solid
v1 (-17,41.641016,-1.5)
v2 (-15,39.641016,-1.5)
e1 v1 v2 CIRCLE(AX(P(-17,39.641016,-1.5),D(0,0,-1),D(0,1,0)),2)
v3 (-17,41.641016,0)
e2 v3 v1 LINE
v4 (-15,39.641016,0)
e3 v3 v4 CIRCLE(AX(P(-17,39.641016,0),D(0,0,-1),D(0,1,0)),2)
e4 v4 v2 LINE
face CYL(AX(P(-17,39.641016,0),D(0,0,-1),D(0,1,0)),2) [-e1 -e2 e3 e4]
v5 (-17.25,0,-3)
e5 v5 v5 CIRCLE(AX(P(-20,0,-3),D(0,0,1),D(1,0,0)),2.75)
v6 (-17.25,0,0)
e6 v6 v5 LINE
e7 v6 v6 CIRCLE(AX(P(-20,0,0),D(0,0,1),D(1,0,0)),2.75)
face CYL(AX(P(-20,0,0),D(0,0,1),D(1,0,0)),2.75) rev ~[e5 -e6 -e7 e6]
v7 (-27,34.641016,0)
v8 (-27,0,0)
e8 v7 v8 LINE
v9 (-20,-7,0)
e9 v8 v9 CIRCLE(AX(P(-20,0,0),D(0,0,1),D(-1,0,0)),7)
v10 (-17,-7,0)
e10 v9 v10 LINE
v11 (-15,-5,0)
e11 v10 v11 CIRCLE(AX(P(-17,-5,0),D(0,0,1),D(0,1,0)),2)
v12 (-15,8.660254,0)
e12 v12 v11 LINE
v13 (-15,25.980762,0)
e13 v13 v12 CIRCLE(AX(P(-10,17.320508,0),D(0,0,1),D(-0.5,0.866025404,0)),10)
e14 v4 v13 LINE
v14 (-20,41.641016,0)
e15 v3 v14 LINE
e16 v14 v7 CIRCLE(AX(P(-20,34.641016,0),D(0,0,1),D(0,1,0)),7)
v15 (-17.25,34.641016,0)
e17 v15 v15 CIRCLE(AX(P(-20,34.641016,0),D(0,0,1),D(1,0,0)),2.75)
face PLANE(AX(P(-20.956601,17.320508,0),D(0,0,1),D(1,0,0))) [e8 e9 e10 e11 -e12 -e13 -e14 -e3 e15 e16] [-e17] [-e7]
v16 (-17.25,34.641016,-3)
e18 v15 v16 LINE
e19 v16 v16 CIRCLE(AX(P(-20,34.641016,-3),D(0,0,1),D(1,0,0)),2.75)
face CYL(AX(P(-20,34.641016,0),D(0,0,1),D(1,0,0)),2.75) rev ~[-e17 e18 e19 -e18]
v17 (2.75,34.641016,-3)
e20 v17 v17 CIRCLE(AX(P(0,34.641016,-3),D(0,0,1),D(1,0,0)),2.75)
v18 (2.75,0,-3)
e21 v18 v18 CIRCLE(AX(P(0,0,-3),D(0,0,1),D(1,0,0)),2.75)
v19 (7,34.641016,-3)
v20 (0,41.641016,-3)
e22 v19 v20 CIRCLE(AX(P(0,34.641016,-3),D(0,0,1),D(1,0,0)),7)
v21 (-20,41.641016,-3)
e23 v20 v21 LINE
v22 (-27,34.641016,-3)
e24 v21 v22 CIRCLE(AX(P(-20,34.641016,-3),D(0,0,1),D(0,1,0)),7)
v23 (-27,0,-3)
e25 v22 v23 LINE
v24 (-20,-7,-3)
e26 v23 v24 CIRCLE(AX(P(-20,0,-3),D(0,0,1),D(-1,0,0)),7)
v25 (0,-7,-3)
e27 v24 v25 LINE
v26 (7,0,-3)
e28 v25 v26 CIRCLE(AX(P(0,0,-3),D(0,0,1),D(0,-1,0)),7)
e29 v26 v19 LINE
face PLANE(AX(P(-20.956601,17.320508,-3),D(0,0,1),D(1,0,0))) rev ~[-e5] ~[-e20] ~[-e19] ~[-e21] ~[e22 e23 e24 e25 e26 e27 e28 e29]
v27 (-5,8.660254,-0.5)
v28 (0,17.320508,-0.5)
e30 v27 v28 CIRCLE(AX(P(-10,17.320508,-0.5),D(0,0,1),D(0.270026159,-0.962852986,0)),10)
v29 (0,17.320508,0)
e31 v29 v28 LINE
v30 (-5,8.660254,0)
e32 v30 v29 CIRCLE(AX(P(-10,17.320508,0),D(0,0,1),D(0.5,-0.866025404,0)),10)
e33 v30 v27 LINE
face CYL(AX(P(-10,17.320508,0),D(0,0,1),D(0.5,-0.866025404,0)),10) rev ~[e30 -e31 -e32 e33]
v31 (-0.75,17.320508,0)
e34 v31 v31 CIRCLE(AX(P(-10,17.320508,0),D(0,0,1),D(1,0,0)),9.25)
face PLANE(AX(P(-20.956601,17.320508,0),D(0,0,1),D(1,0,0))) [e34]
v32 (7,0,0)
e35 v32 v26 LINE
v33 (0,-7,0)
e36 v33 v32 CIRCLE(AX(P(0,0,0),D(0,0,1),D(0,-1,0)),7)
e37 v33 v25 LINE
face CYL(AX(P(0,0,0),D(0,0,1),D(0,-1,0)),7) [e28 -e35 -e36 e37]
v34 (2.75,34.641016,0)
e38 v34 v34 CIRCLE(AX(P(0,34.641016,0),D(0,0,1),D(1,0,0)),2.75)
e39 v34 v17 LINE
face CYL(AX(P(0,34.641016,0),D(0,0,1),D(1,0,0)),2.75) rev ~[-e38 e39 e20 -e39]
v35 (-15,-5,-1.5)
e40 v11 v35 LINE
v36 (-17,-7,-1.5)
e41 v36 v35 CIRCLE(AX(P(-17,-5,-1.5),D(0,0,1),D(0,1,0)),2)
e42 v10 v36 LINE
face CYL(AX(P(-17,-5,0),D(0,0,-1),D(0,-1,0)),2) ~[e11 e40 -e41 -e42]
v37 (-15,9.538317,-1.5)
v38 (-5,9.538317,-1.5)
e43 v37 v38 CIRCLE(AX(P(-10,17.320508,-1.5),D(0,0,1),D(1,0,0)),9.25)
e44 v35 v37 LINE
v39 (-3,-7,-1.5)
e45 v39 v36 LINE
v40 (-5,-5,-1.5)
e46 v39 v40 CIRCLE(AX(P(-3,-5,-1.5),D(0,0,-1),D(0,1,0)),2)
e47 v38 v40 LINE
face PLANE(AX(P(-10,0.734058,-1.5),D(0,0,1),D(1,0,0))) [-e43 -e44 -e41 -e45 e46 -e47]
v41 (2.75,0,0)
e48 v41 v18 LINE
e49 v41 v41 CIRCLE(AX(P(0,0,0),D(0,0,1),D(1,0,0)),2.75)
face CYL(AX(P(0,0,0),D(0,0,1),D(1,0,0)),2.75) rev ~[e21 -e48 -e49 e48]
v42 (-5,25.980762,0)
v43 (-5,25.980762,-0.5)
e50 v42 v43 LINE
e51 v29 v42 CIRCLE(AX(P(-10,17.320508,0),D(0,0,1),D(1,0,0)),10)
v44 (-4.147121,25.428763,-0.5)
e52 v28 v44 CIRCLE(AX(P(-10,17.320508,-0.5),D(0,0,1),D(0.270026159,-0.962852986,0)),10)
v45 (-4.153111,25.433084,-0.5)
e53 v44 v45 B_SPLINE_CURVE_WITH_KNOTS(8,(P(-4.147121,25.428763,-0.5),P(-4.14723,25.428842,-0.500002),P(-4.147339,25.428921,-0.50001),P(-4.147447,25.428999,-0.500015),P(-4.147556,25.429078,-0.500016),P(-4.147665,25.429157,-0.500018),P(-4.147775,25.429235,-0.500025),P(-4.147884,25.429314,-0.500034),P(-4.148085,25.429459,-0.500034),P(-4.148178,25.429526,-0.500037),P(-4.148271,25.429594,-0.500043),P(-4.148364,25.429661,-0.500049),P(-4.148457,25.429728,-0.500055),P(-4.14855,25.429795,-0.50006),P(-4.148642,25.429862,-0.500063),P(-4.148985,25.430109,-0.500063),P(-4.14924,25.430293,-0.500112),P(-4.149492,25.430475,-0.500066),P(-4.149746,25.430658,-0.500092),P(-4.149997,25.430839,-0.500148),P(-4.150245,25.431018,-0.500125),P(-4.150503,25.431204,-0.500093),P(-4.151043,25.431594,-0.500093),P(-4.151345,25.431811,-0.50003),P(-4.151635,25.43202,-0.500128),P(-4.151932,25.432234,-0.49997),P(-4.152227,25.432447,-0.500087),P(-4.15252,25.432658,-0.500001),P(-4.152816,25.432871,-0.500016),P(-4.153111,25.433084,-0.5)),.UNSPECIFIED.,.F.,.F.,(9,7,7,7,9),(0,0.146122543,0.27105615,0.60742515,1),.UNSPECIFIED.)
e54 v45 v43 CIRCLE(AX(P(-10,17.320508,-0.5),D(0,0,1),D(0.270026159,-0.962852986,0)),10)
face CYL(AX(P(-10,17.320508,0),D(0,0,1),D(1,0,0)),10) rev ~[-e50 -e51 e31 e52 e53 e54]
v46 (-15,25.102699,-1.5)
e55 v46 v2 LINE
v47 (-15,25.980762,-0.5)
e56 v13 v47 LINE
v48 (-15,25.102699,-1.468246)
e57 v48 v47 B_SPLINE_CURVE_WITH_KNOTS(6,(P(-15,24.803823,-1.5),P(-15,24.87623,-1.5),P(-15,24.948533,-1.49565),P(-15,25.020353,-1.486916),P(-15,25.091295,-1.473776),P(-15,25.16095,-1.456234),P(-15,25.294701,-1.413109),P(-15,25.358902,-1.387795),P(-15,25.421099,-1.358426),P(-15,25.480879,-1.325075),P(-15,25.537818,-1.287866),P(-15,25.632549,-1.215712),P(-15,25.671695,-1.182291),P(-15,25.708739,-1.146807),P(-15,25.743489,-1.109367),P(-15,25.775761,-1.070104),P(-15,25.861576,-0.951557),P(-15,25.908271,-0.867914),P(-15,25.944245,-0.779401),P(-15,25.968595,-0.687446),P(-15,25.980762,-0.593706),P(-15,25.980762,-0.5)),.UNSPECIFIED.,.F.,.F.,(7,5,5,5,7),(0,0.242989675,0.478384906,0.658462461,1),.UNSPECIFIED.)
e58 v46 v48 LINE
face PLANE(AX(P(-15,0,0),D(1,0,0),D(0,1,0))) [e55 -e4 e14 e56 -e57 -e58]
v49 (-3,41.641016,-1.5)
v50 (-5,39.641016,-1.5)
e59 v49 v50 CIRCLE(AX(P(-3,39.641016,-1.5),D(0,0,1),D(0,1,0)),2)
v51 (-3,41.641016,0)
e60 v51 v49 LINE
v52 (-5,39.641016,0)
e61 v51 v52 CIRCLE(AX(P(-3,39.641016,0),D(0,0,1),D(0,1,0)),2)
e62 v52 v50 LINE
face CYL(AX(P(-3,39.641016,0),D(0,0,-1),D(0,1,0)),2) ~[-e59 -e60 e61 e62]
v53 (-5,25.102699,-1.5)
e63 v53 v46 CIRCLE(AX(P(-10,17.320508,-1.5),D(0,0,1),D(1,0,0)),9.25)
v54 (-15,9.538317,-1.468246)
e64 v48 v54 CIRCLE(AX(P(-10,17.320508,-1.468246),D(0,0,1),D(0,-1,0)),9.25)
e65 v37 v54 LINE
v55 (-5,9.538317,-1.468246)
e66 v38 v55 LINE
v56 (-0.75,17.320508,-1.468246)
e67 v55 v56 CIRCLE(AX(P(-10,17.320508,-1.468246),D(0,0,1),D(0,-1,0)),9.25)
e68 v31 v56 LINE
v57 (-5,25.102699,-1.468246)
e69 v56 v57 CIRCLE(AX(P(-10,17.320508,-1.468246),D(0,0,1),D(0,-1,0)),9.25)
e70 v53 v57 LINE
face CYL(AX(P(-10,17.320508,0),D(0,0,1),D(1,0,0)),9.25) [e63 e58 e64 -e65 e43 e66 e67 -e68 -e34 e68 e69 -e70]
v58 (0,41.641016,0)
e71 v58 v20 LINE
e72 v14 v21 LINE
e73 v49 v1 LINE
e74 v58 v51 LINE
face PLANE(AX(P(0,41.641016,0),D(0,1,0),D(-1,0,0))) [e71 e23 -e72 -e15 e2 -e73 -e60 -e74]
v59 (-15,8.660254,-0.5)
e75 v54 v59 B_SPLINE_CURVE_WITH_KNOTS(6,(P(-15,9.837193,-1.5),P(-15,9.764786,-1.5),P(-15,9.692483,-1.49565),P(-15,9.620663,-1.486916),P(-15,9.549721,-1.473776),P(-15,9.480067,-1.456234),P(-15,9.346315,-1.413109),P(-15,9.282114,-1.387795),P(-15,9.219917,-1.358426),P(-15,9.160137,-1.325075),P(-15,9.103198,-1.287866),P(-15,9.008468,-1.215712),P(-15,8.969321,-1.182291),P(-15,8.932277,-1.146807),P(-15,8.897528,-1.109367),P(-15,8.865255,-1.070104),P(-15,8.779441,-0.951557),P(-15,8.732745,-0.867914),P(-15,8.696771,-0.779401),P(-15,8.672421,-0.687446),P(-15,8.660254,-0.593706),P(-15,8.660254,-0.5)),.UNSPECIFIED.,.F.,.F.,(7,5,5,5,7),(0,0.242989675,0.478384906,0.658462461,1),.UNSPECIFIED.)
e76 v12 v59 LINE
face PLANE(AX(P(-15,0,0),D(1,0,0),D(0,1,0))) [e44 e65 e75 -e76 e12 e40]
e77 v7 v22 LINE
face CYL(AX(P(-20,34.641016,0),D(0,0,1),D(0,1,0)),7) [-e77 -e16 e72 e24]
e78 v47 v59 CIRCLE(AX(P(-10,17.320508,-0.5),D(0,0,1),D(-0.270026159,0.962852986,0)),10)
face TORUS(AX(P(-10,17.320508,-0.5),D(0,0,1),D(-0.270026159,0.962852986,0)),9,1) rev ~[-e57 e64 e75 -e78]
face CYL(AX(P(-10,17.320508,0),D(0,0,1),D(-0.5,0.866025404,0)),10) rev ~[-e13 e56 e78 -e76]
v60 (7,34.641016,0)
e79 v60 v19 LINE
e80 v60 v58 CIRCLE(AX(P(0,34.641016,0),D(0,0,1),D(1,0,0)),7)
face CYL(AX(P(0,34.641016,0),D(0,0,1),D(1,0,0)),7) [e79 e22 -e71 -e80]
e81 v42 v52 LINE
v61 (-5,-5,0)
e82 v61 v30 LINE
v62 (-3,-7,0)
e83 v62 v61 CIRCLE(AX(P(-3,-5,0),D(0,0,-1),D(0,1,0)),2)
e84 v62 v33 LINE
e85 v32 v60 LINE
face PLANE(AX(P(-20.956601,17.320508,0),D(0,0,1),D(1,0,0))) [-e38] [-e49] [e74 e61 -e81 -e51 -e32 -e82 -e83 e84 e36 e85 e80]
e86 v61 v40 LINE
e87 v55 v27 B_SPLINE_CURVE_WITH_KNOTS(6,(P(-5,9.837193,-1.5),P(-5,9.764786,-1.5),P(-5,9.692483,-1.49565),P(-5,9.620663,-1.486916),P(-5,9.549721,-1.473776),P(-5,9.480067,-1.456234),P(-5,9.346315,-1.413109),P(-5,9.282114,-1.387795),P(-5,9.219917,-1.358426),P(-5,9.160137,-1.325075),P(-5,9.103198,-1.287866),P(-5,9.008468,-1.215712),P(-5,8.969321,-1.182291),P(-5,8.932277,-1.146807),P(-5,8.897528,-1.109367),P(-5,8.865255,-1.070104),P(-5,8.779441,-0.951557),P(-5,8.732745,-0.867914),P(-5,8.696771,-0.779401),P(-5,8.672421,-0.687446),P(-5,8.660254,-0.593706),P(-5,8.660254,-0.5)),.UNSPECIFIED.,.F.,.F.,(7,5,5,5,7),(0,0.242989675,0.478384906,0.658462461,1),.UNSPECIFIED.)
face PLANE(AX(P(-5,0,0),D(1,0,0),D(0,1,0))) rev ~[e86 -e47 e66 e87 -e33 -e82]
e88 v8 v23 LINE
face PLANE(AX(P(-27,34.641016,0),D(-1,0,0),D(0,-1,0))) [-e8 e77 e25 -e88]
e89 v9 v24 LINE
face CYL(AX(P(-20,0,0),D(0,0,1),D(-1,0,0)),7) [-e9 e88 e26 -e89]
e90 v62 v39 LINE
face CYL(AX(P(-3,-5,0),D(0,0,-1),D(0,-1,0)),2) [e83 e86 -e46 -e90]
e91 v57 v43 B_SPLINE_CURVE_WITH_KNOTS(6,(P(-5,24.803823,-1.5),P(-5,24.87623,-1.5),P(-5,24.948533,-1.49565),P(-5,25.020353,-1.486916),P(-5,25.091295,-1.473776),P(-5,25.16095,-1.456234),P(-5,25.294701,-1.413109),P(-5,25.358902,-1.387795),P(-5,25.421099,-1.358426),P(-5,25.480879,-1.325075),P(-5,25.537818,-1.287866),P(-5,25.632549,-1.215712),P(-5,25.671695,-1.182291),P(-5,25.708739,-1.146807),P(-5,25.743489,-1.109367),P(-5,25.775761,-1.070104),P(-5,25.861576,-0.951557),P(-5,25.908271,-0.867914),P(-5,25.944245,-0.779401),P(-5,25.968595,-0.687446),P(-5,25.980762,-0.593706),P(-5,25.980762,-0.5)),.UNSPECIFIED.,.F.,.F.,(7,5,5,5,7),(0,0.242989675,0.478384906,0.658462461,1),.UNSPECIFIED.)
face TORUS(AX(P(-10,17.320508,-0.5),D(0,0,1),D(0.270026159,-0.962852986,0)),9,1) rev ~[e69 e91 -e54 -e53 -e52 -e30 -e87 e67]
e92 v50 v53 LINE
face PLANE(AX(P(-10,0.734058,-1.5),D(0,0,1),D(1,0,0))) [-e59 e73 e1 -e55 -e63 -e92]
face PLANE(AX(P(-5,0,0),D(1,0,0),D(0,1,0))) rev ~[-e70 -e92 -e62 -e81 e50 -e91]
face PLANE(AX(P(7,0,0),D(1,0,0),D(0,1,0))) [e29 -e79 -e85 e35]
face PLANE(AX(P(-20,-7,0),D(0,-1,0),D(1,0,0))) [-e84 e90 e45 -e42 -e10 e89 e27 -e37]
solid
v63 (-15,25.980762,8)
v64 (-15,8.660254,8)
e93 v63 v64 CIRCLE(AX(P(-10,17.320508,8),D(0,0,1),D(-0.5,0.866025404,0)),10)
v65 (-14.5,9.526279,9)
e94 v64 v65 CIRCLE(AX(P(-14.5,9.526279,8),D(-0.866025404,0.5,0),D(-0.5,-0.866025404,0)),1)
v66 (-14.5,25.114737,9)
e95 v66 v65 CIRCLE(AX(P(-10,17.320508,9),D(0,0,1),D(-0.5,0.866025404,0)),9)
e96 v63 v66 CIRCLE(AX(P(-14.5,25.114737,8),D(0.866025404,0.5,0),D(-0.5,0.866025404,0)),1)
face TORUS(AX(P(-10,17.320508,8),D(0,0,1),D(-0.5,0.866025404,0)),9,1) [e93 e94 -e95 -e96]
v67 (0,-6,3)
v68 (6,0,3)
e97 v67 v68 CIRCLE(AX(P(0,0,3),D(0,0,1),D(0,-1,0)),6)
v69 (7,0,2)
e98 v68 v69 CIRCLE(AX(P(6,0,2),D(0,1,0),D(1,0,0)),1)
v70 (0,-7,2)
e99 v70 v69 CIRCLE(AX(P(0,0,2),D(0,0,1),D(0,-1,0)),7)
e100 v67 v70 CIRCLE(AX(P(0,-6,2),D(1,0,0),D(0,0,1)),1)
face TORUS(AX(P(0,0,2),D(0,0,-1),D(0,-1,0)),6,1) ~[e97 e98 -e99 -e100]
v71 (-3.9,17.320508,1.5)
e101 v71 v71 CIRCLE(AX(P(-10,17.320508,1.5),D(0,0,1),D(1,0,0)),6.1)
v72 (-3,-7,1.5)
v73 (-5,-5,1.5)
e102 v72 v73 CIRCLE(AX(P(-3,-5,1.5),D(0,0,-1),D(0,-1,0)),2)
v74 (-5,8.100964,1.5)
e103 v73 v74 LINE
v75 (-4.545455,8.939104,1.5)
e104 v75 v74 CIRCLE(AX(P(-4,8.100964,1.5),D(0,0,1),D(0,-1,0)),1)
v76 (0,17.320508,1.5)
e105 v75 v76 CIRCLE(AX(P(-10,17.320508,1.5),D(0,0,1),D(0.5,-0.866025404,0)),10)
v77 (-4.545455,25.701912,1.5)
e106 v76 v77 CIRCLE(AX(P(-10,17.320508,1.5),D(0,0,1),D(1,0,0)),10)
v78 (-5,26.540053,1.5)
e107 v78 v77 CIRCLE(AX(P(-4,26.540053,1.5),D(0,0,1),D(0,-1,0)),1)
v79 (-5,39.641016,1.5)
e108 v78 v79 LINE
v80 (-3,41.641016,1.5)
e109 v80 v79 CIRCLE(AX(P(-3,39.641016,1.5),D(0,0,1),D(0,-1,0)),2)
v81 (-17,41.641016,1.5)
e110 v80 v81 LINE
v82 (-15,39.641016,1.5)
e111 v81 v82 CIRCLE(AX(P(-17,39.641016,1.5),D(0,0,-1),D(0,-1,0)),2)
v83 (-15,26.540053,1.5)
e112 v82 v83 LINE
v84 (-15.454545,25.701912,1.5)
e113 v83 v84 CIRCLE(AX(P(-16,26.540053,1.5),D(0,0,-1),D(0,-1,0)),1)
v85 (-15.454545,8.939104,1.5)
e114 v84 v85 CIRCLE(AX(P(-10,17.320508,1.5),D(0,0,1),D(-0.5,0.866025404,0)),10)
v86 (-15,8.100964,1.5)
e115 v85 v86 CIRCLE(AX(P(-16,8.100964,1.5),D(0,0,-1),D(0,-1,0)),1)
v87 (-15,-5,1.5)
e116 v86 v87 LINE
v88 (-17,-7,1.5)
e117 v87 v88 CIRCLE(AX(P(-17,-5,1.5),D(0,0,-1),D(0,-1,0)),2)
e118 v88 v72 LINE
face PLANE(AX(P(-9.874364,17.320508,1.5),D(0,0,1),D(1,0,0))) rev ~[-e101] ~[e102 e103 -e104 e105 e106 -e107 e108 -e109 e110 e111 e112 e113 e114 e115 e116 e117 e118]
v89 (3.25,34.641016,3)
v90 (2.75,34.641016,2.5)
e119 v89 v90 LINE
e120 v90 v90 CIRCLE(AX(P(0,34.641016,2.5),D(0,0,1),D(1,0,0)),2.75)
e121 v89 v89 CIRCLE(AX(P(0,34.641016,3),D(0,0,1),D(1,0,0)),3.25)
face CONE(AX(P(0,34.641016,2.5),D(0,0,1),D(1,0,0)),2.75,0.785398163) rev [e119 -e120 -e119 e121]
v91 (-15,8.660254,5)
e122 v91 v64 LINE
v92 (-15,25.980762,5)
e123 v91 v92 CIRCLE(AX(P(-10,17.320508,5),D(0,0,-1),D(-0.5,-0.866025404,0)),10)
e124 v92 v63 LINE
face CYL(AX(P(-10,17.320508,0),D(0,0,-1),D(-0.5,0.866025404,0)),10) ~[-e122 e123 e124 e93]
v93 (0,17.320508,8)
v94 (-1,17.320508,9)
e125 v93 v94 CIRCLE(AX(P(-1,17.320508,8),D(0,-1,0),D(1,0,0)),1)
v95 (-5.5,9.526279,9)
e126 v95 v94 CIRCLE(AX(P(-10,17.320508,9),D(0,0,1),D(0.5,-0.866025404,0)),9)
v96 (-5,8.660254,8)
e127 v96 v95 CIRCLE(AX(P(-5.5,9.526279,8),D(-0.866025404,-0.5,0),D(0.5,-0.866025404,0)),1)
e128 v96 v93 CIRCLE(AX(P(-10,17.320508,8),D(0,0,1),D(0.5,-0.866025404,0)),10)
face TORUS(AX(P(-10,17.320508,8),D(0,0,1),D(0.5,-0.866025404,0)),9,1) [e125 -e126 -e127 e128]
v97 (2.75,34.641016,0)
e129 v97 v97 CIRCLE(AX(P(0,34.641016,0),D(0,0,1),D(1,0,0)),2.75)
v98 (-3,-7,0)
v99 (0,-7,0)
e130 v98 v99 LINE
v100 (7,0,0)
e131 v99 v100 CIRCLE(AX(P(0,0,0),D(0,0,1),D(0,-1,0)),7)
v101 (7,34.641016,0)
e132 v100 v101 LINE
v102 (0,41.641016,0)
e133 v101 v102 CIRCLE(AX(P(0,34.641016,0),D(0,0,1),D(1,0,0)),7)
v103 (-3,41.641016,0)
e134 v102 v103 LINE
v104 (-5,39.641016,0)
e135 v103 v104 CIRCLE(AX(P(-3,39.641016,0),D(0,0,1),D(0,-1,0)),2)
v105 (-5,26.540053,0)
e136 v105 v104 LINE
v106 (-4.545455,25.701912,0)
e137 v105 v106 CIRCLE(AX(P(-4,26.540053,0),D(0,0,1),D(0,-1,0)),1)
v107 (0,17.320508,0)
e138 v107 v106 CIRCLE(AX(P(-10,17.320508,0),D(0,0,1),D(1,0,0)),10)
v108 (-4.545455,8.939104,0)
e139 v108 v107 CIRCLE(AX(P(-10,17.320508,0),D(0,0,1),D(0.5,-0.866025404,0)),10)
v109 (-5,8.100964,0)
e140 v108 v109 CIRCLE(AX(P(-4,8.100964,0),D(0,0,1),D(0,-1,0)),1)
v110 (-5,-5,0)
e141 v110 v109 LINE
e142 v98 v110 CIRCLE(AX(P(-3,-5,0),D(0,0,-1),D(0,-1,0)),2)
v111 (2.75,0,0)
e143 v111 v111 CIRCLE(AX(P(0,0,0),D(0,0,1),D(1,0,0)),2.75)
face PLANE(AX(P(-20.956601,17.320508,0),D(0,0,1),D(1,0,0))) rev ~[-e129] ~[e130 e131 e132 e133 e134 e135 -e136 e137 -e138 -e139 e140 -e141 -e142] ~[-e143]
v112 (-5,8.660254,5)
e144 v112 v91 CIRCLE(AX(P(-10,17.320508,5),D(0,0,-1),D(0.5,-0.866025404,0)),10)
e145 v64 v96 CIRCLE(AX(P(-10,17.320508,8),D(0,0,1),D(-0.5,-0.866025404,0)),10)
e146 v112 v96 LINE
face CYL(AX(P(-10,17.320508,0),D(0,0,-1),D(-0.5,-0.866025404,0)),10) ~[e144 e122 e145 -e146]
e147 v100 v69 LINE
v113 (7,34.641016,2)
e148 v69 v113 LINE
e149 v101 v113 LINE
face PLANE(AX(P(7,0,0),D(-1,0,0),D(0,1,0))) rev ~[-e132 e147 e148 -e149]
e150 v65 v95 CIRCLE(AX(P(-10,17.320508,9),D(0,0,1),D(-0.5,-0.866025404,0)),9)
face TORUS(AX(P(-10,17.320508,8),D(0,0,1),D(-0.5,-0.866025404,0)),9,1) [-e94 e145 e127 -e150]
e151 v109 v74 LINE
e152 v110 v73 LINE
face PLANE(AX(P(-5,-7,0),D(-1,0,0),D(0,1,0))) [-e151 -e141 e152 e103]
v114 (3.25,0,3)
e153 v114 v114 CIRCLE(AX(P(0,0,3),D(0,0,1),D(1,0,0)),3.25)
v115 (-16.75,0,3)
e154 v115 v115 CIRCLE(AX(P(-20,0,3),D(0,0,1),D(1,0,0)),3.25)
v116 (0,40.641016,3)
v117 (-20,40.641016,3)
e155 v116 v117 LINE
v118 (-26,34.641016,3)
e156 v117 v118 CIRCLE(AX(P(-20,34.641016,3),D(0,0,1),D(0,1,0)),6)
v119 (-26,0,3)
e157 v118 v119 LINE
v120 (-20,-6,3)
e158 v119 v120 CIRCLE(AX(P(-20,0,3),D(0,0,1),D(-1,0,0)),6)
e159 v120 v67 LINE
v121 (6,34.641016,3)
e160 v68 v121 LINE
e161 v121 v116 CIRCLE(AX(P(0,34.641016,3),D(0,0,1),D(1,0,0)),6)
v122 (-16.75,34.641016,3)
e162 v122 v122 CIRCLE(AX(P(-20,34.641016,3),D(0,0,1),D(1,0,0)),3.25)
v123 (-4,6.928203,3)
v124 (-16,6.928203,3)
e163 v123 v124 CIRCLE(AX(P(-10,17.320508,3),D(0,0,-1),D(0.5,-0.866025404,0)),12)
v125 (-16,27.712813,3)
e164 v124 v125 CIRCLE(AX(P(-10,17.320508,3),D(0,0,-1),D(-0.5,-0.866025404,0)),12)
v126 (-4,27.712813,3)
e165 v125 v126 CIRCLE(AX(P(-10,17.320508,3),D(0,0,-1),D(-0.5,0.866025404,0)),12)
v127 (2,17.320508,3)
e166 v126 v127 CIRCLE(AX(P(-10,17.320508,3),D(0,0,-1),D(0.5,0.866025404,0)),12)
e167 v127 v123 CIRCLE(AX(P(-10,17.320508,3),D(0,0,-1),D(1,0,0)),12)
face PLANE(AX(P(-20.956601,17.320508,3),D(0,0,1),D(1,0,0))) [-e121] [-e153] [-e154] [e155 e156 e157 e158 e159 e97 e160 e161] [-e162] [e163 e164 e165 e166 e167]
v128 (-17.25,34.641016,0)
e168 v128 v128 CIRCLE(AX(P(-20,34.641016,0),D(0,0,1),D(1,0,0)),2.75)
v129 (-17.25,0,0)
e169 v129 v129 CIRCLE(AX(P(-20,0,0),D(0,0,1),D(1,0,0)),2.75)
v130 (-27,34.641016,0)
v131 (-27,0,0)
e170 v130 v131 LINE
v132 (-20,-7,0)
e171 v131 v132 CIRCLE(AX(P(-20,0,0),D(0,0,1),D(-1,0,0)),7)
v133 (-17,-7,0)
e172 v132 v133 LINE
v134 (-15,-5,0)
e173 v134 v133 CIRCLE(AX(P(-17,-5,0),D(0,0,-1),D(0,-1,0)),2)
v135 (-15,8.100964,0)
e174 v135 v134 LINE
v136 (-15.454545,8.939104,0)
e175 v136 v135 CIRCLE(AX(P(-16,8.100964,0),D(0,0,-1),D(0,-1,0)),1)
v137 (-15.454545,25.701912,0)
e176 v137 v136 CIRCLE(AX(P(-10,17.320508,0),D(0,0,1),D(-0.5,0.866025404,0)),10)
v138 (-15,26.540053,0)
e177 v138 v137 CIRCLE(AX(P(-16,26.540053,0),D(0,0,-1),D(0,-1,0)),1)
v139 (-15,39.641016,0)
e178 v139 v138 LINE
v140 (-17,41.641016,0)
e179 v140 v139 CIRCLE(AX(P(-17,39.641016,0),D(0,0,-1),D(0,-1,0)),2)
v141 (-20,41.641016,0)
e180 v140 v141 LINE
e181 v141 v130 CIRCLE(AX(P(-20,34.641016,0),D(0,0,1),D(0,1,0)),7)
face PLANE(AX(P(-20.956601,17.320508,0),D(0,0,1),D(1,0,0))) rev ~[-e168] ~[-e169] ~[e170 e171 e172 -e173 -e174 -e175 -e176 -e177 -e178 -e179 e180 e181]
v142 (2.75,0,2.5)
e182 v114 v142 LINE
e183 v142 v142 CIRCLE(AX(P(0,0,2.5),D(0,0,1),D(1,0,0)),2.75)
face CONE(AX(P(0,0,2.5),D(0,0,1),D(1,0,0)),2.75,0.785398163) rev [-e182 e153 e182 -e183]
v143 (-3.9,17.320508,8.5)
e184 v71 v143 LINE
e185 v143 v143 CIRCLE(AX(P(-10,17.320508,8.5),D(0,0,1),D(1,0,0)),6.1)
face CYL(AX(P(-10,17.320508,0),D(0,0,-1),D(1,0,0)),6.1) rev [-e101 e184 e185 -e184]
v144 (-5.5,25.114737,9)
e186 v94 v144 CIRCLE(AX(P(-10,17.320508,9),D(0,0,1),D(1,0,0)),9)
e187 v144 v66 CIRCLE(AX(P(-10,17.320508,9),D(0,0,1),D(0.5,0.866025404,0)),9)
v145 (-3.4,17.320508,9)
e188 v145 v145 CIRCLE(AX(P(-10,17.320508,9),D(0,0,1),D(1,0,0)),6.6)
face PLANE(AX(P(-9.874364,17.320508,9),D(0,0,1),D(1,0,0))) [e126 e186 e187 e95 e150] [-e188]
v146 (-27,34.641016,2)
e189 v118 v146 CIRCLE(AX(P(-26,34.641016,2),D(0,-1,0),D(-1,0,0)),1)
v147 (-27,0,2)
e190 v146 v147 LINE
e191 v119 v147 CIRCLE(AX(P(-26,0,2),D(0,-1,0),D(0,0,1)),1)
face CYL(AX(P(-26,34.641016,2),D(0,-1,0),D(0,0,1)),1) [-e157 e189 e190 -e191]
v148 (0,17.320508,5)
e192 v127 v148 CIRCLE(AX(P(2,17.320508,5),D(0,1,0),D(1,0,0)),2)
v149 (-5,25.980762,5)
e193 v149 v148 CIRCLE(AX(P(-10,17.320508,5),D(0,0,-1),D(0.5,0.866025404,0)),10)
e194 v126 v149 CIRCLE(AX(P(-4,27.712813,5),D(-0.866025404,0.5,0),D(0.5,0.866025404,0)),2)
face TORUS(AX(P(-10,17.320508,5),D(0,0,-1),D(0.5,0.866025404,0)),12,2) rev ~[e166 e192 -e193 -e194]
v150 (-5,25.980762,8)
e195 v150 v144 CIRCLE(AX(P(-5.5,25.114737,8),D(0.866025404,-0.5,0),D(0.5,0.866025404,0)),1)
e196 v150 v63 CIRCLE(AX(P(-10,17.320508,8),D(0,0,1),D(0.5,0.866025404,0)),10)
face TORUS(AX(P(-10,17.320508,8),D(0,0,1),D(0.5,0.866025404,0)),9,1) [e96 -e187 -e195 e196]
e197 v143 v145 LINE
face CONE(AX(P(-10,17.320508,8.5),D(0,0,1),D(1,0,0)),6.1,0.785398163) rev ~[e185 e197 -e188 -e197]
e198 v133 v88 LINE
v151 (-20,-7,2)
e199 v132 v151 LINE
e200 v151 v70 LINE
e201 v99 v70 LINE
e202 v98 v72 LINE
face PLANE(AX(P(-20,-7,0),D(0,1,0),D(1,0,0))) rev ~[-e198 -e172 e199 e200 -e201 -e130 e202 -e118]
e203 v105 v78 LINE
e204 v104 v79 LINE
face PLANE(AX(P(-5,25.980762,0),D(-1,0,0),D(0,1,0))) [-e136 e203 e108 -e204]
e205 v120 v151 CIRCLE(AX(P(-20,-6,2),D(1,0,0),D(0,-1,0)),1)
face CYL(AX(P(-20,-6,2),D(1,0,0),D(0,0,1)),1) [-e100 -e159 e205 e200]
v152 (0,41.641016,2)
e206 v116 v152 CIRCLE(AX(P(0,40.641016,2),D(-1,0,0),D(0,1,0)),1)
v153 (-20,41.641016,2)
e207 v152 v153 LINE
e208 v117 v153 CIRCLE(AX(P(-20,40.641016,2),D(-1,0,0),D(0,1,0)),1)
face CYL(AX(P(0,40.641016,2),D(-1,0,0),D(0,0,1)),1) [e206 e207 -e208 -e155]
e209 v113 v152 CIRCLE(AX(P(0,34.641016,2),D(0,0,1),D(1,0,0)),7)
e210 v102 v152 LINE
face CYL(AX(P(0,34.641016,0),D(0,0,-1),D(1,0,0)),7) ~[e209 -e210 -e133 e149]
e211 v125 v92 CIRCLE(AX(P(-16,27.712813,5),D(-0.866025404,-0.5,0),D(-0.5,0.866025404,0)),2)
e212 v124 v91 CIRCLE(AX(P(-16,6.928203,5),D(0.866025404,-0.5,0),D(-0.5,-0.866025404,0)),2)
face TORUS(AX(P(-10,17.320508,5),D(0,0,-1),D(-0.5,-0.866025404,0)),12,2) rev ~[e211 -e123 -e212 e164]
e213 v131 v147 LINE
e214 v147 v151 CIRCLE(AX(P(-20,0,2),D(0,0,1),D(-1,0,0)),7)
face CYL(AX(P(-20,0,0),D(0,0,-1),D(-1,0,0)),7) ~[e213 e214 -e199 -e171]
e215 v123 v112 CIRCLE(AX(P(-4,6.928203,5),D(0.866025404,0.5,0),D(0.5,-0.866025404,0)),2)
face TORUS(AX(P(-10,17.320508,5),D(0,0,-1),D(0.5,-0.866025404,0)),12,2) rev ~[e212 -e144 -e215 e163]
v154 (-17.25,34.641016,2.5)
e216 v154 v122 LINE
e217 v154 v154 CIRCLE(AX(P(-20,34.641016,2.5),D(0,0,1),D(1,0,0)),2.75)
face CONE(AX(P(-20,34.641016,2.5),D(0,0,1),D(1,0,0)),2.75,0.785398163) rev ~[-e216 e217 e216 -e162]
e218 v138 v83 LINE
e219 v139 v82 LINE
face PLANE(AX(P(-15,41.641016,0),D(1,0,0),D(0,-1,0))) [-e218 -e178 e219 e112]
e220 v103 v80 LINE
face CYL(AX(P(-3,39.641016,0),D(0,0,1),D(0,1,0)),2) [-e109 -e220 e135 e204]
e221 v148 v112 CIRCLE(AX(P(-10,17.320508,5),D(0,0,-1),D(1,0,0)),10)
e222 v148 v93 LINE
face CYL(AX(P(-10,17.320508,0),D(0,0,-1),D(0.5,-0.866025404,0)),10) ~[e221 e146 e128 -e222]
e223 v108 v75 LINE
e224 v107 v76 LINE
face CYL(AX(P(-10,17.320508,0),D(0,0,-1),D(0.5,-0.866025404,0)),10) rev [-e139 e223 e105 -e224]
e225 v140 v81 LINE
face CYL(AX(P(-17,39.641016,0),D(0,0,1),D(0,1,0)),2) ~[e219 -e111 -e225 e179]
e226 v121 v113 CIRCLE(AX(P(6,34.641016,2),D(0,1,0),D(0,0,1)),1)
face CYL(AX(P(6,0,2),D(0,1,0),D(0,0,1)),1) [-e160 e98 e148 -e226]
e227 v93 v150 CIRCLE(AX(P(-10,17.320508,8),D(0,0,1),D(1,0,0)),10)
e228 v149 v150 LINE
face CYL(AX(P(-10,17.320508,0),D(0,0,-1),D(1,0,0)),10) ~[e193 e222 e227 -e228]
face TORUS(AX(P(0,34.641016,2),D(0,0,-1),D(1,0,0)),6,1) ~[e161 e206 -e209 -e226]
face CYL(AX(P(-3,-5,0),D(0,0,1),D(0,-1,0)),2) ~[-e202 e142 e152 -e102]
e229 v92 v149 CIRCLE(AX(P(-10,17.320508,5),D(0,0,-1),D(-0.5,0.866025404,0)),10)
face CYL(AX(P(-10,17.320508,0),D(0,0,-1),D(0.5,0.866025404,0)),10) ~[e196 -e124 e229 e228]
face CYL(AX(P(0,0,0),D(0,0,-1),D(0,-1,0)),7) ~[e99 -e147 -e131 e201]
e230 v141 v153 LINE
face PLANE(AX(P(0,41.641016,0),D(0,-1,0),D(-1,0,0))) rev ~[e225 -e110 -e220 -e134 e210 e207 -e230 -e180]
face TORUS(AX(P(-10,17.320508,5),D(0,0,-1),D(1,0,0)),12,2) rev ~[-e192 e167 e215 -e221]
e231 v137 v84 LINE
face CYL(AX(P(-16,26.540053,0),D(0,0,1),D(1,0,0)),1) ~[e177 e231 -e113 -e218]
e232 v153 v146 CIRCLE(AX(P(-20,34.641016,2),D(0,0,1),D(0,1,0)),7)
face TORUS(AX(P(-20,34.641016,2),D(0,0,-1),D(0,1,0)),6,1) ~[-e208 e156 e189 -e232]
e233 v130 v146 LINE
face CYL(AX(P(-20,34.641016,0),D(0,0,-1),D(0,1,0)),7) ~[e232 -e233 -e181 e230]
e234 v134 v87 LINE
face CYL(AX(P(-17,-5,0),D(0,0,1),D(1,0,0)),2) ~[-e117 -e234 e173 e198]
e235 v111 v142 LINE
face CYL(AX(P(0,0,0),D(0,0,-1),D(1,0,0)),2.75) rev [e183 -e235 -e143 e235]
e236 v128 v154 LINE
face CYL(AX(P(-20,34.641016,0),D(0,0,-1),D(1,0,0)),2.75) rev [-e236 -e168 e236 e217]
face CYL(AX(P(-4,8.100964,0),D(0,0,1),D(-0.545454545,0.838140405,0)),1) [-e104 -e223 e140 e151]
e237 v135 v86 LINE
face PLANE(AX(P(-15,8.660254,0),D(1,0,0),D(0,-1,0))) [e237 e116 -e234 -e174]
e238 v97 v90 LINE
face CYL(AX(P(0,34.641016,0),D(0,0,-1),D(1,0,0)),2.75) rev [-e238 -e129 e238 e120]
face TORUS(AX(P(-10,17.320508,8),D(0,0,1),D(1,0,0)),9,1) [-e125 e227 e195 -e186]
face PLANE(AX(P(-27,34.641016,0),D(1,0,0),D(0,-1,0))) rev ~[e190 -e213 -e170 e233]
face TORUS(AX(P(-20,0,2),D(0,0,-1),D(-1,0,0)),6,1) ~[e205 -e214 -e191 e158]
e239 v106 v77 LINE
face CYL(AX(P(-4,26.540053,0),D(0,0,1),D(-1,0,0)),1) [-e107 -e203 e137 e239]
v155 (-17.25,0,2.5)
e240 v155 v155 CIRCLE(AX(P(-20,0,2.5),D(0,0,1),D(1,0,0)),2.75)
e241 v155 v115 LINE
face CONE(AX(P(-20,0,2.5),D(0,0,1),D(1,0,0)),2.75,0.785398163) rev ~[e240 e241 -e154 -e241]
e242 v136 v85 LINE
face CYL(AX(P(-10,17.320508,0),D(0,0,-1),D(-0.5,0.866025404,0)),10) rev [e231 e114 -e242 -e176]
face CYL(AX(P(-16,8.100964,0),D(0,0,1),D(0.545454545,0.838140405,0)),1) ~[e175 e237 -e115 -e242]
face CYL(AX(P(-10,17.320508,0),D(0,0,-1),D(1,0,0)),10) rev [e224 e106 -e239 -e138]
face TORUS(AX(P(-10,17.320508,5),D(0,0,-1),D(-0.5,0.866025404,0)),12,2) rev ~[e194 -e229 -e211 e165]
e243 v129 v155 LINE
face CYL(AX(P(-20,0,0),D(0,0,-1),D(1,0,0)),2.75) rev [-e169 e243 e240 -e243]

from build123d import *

# Parameters (mm, degrees)
F0_R          = 2.75
F0_R_2        = 9.25
F0_R_3        = 6.1
F1_DEPTH      = 3
F2_DEPTH      = 9
F3_DEPTH      = 1.5
F4_SIZE       = 0.5
F0_R_4        = 5
F5_DEPTH      = 3
F6_DEPTH      = 1.5
F7_R          = 2
F7_2_R        = 2
F8_F1_R       = 1
F8_F2_R       = 1
F8_F3_R       = 1
F8_F4_R       = 1
F8_F5_R       = 1
F8_F6_R       = 1
F8_2_T4_ANGLE = 148.66835306
F8_2_T9_ANGLE = 148.66835306


# Not quite as in the source:
# - a fillet or chamfer that OpenCascade refuses, or shapes differently, is made with other operations: its cross-section is extruded or revolved along the edge and cut away or added
# - a feature names something its author has since deleted; it is built from what else it names


with BuildPart() as f1:
    # F0 (on Top) → F1 (new body)
    with BuildSketch(Plane.XY):
        with BuildLine():
            ThreePointArc((-15, 8.6602540378), (-20, 17.3205080757), (-15, 25.9807621135))
            Line((-15, 25.9807621135), (-15, 41.6410161514))
            Line((-15, 41.6410161514), (-20, 41.6410161514))
            ThreePointArc((-20, 41.6410161514), (-24.9497474683, 39.5907636197), (-27, 34.6410161514))
            Line((-27, 34.6410161514), (-27, 17.3205080757))
            Line((-27, 17.3205080757), (-27, 0))
            ThreePointArc((-27, 0), (-24.9497474683, -4.9497474683), (-20, -7))
            Line((-20, -7), (-15, -7))
            Line((-15, -7), (-15, 8.6602540378))
        make_face()
        with Locations((-20, 0)):
            Circle(F0_R, mode=Mode.SUBTRACT)
        with Locations((-20, 34.6410161514)):
            Circle(F0_R, mode=Mode.SUBTRACT)
        with BuildLine():
            ThreePointArc((-5, 8.6602540378), (-1.3397459622, 12.3205080757), (0, 17.3205080757))
            ThreePointArc((0, 17.3205080757), (-1.3397459622, 22.3205080757), (-5, 25.9807621135))
            ThreePointArc((-5, 25.9807621135), (-10, 27.3205080757), (-15, 25.9807621135))
            ThreePointArc((-15, 25.9807621135), (-20, 17.3205080757), (-15, 8.6602540378))
            ThreePointArc((-15, 8.6602540378), (-10, 7.3205080757), (-5, 8.6602540378))
        make_face()
        with Locations((-10, 17.3205080757)):
            Circle(F0_R_2, mode=Mode.SUBTRACT)
        with BuildLine():
            Line((-5, -7), (-5, 8.6602540378))
            ThreePointArc((-5, 8.6602540378), (-10, 7.3205080757), (-15, 8.6602540378))
            Line((-15, 8.6602540378), (-15, -7))
            Line((-15, -7), (-10, -7))
            Line((-10, -7), (-5, -7))
        make_face()
        with BuildLine():
            ThreePointArc((-15, 25.9807621135), (-10, 27.3205080757), (-5, 25.9807621135))
            Line((-5, 25.9807621135), (-5, 41.6410161514))
            Line((-5, 41.6410161514), (-10, 41.6410161514))
            Line((-10, 41.6410161514), (-15, 41.6410161514))
            Line((-15, 41.6410161514), (-15, 25.9807621135))
        make_face()
        with BuildLine():
            ThreePointArc((-5, 25.9807621135), (-1.3397459622, 22.3205080757), (0, 17.3205080757))
            ThreePointArc((0, 17.3205080757), (-1.3397459622, 12.3205080757), (-5, 8.6602540378))
            Line((-5, 8.6602540378), (-5, -7))
            Line((-5, -7), (0, -7))
            ThreePointArc((0, -7), (4.9497474683, -4.9497474683), (7, 0))
            Line((7, 0), (7, 17.3205080757))
            Line((7, 17.3205080757), (7, 34.6410161514))
            ThreePointArc((7, 34.6410161514), (4.9497474683, 39.5907636197), (0, 41.6410161514))
            Line((0, 41.6410161514), (-5, 41.6410161514))
            Line((-5, 41.6410161514), (-5, 25.9807621135))
        make_face()
        Circle(F0_R, mode=Mode.SUBTRACT)
        with Locations((0, 34.6410161514)):
            Circle(F0_R, mode=Mode.SUBTRACT)
        with Locations((-10, 17.3205080757)):
            Circle(F0_R_2)
        with Locations((-10, 17.3205080757)):
            Circle(F0_R_3, mode=Mode.SUBTRACT)
    extrude(amount=F1_DEPTH)

    # F0 (on Top) → F2 (join)
    with BuildSketch(Plane.XY):
        with BuildLine():
            ThreePointArc((-5, 8.6602540378), (-1.3397459622, 12.3205080757), (0, 17.3205080757))
            ThreePointArc((0, 17.3205080757), (-1.3397459622, 22.3205080757), (-5, 25.9807621135))
            ThreePointArc((-5, 25.9807621135), (-10, 27.3205080757), (-15, 25.9807621135))
            ThreePointArc((-15, 25.9807621135), (-20, 17.3205080757), (-15, 8.6602540378))
            ThreePointArc((-15, 8.6602540378), (-10, 7.3205080757), (-5, 8.6602540378))
        make_face()
        with Locations((-10, 17.3205080757)):
            Circle(F0_R_2, mode=Mode.SUBTRACT)
        with Locations((-10, 17.3205080757)):
            Circle(F0_R_2)
        with Locations((-10, 17.3205080757)):
            Circle(F0_R_3, mode=Mode.SUBTRACT)
    extrude(amount=F2_DEPTH)

    # F0 (on Top) → F3 (cut)
    with BuildSketch(Plane.XY):
        with BuildLine():
            ThreePointArc((-5, 8.6602540378), (-1.3397459622, 12.3205080757), (0, 17.3205080757))
            ThreePointArc((0, 17.3205080757), (-1.3397459622, 22.3205080757), (-5, 25.9807621135))
            ThreePointArc((-5, 25.9807621135), (-10, 27.3205080757), (-15, 25.9807621135))
            ThreePointArc((-15, 25.9807621135), (-20, 17.3205080757), (-15, 8.6602540378))
            ThreePointArc((-15, 8.6602540378), (-10, 7.3205080757), (-5, 8.6602540378))
        make_face()
        with Locations((-10, 17.3205080757)):
            Circle(F0_R_2, mode=Mode.SUBTRACT)
        with Locations((-10, 17.3205080757)):
            Circle(F0_R_2)
        with Locations((-10, 17.3205080757)):
            Circle(F0_R_3, mode=Mode.SUBTRACT)
        with BuildLine():
            Line((-5, -7), (-5, 8.6602540378))
            ThreePointArc((-5, 8.6602540378), (-10, 7.3205080757), (-15, 8.6602540378))
            Line((-15, 8.6602540378), (-15, -7))
            Line((-15, -7), (-10, -7))
            Line((-10, -7), (-5, -7))
        make_face()
        with BuildLine():
            ThreePointArc((-15, 25.9807621135), (-10, 27.3205080757), (-5, 25.9807621135))
            Line((-5, 25.9807621135), (-5, 41.6410161514))
            Line((-5, 41.6410161514), (-10, 41.6410161514))
            Line((-10, 41.6410161514), (-15, 41.6410161514))
            Line((-15, 41.6410161514), (-15, 25.9807621135))
        make_face()
    extrude(amount=F3_DEPTH, mode=Mode.SUBTRACT)

    # F4
    f4_edges = [f1.edges().sort_by_distance(p)[0] for p in [
        (-16.1, 17.320508, 9),
        (-22.75, 0, 3),
        (-22.75, 34.641016, 3),
        (-2.75, 34.641016, 3),
        (-2.75, 0, 3),
    ]]
    chamfer(f4_edges, length=F4_SIZE)

    # F7
    f7_edges = [f1.edges().sort_by_distance(p)[0] for p in [
        (-15, 25.980762, 3),
        (-5, -7, 0.75),
        (-15, -7, 0.75),
        (-15, 41.641016, 0.75),
        (-5, 41.641016, 0.75),
    ]]
    fillet(f7_edges, radius=F7_R)

    # F8: fillet of radius 1 on 13 edges, made by hand

    # F8_f1
    f8_f1_edges = [f1.edges().sort_by_distance(p)[0] for p in [
        (-24.9497474683, 39.5907636197, 3),
        (-10, 41.6410161514, 3),
        (-27, 17.3205080757, 3),
        (4.9497474683, 39.5907636197, 3),
        (-24.9497474683, -4.9497474683, 3),
        (7, 17.3205080757, 3),
        (-10, -7, 3),
        (4.9497474683, -4.9497474683, 3),
    ]]
    fillet(f8_f1_edges, radius=F8_F1_R)

    # F8_f2
    f8_f2_edges = [f1.edges().sort_by_distance(p)[0] for p in [
        (-15, 25.9807621135, 9),
    ]]
    fillet(f8_f2_edges, radius=F8_F2_R)

    # F8_f3
    f8_f3_edges = [f1.edges().sort_by_distance(p)[0] for p in [
        (-15, 25.9807621135, 0.75),
    ]]
    fillet(f8_f3_edges, radius=F8_F3_R)

    # F8_f4
    f8_f4_edges = [f1.edges().sort_by_distance(p)[0] for p in [
        (-15, 8.6602540378, 0.75),
    ]]
    fillet(f8_f4_edges, radius=F8_F4_R)

    # F8_f5
    f8_f5_edges = [f1.edges().sort_by_distance(p)[0] for p in [
        (-5, 25.9807621135, 0.75),
    ]]
    fillet(f8_f5_edges, radius=F8_F5_R)

    # F8_f6
    f8_f6_edges = [f1.edges().sort_by_distance(p)[0] for p in [
        (-5, 8.6602540378, 0.75),
    ]]
    fillet(f8_f6_edges, radius=F8_F6_R)


with BuildPart() as f5:
    # F0 (on Top) → F5 (new body)
    with BuildSketch(Plane.XY):
        with BuildLine():
            ThreePointArc((-15, 8.6602540378), (-20, 17.3205080757), (-15, 25.9807621135))
            Line((-15, 25.9807621135), (-15, 41.6410161514))
            Line((-15, 41.6410161514), (-20, 41.6410161514))
            ThreePointArc((-20, 41.6410161514), (-24.9497474683, 39.5907636197), (-27, 34.6410161514))
            Line((-27, 34.6410161514), (-27, 17.3205080757))
            Line((-27, 17.3205080757), (-27, 0))
            ThreePointArc((-27, 0), (-24.9497474683, -4.9497474683), (-20, -7))
            Line((-20, -7), (-15, -7))
            Line((-15, -7), (-15, 8.6602540378))
        make_face()
        with Locations((-20, 0)):
            Circle(F0_R, mode=Mode.SUBTRACT)
        with Locations((-20, 34.6410161514)):
            Circle(F0_R, mode=Mode.SUBTRACT)
        with BuildLine():
            ThreePointArc((-5, 25.9807621135), (-1.3397459622, 22.3205080757), (0, 17.3205080757))
            ThreePointArc((0, 17.3205080757), (-1.3397459622, 12.3205080757), (-5, 8.6602540378))
            Line((-5, 8.6602540378), (-5, -7))
            Line((-5, -7), (0, -7))
            ThreePointArc((0, -7), (4.9497474683, -4.9497474683), (7, 0))
            Line((7, 0), (7, 17.3205080757))
            Line((7, 17.3205080757), (7, 34.6410161514))
            ThreePointArc((7, 34.6410161514), (4.9497474683, 39.5907636197), (0, 41.6410161514))
            Line((0, 41.6410161514), (-5, 41.6410161514))
            Line((-5, 41.6410161514), (-5, 25.9807621135))
        make_face()
        Circle(F0_R, mode=Mode.SUBTRACT)
        with Locations((0, 34.6410161514)):
            Circle(F0_R, mode=Mode.SUBTRACT)
        with BuildLine():
            ThreePointArc((-5, 8.6602540378), (-1.3397459622, 12.3205080757), (0, 17.3205080757))
            ThreePointArc((0, 17.3205080757), (-1.3397459622, 22.3205080757), (-5, 25.9807621135))
            ThreePointArc((-5, 25.9807621135), (-10, 27.3205080757), (-15, 25.9807621135))
            ThreePointArc((-15, 25.9807621135), (-20, 17.3205080757), (-15, 8.6602540378))
            ThreePointArc((-15, 8.6602540378), (-10, 7.3205080757), (-5, 8.6602540378))
        make_face()
        with Locations((-10, 17.3205080757)):
            Circle(F0_R_2, mode=Mode.SUBTRACT)
        with Locations((-10, 17.3205080757)):
            Circle(F0_R_2)
        with Locations((-10, 17.3205080757)):
            Circle(F0_R_3, mode=Mode.SUBTRACT)
        with BuildLine():
            Line((-5, -7), (-5, 8.6602540378))
            ThreePointArc((-5, 8.6602540378), (-10, 7.3205080757), (-15, 8.6602540378))
            Line((-15, 8.6602540378), (-15, -7))
            Line((-15, -7), (-10, -7))
            Line((-10, -7), (-5, -7))
        make_face()
        with BuildLine():
            ThreePointArc((-15, 25.9807621135), (-10, 27.3205080757), (-5, 25.9807621135))
            Line((-5, 25.9807621135), (-5, 41.6410161514))
            Line((-5, 41.6410161514), (-10, 41.6410161514))
            Line((-10, 41.6410161514), (-15, 41.6410161514))
            Line((-15, 41.6410161514), (-15, 25.9807621135))
        make_face()
        with Locations((-10, 17.3205080757)):
            Circle(F0_R_3)
        with Locations((-10, 17.3205080757)):
            Circle(F0_R_4, mode=Mode.SUBTRACT)
        with Locations((-10, 17.3205080757)):
            Circle(F0_R_4)
    extrude(amount=-F5_DEPTH)

    # F0 (on Top) → F6 (cut)
    with BuildSketch(Plane.XY):
        with BuildLine():
            Line((-5, -7), (-5, 8.6602540378))
            ThreePointArc((-5, 8.6602540378), (-10, 7.3205080757), (-15, 8.6602540378))
            Line((-15, 8.6602540378), (-15, -7))
            Line((-15, -7), (-10, -7))
            Line((-10, -7), (-5, -7))
        make_face()
        with BuildLine():
            ThreePointArc((-5, 8.6602540378), (-1.3397459622, 12.3205080757), (0, 17.3205080757))
            ThreePointArc((0, 17.3205080757), (-1.3397459622, 22.3205080757), (-5, 25.9807621135))
            ThreePointArc((-5, 25.9807621135), (-10, 27.3205080757), (-15, 25.9807621135))
            ThreePointArc((-15, 25.9807621135), (-20, 17.3205080757), (-15, 8.6602540378))
            ThreePointArc((-15, 8.6602540378), (-10, 7.3205080757), (-5, 8.6602540378))
        make_face()
        with Locations((-10, 17.3205080757)):
            Circle(F0_R_2, mode=Mode.SUBTRACT)
        with BuildLine():
            ThreePointArc((-15, 25.9807621135), (-10, 27.3205080757), (-5, 25.9807621135))
            Line((-5, 25.9807621135), (-5, 41.6410161514))
            Line((-5, 41.6410161514), (-10, 41.6410161514))
            Line((-10, 41.6410161514), (-15, 41.6410161514))
            Line((-15, 41.6410161514), (-15, 25.9807621135))
        make_face()
    extrude(amount=-F6_DEPTH, mode=Mode.SUBTRACT)

    # F7#2
    f7_2_edges = [f5.edges().sort_by_distance(p)[0] for p in [
        (-15, 41.641016, -0.75),
        (-5, 41.641016, -0.75),
        (-15, -7, -0.75),
        (-5, -7, -0.75),
    ]]
    fillet(f7_2_edges, radius=F7_2_R)

    # F8#2: fillet of radius 1 on 2 edges, made by hand


with BuildPart() as f8_2_tool2:
    # F8_2_s3 → F8_2_t4 (revolve)
    with BuildSketch(Plane(origin=(-4.7676046878, -1.3370452184, 0), x_dir=(0, 0, 1), z_dir=(-0.9628529864, -0.270026159, 0))):
        with BuildLine():
            ThreePointArc((-1.5, 10.377364517), (-1.2071067812, 9.6702577358), (-0.5, 9.377364517))
            Line((-0.5, 9.377364517), (-1.5, 9.377364517))
            Line((-1.5, 9.377364517), (-1.5, 10.377364517))
        make_face()
    revolve(axis=Axis((-10, 17.3205080757, -1.5), (0, 0, 1)), revolution_arc=F8_2_T4_ANGLE)

    split(bisect_by=Plane.YZ.offset(-5), keep=Keep.TOP)


with BuildPart() as f5_1:
    add(f5.part)

    # F8_2_t1: union F8_2_tool2
    add(f8_2_tool2.part)


with BuildPart() as f8_2_tool7:
    # F8_2_s8 → F8_2_t9 (revolve)
    with BuildSketch(Plane(origin=(-4.7676046878, -1.3370452184, 0), x_dir=(0, 0, 1), z_dir=(0.9628529864, 0.270026159, 0))):
        with BuildLine():
            ThreePointArc((-1.5, -28.377364517), (-1.2071067812, -29.0844712982), (-0.5, -29.377364517))
            Line((-0.5, -29.377364517), (-1.5, -29.377364517))
            Line((-1.5, -29.377364517), (-1.5, -28.377364517))
        make_face()
    revolve(axis=Axis((-10, 17.3205080757, -1.5), (0, 0, 1)), revolution_arc=F8_2_T9_ANGLE)

    split(bisect_by=Plane.YZ.offset(-15), keep=Keep.BOTTOM)


with BuildPart() as f5_2:
    add(f5_1.part)

    # F8_2_t6: union F8_2_tool7
    add(f8_2_tool7.part)


solid = Compound([f1.part, f5_2.part])
